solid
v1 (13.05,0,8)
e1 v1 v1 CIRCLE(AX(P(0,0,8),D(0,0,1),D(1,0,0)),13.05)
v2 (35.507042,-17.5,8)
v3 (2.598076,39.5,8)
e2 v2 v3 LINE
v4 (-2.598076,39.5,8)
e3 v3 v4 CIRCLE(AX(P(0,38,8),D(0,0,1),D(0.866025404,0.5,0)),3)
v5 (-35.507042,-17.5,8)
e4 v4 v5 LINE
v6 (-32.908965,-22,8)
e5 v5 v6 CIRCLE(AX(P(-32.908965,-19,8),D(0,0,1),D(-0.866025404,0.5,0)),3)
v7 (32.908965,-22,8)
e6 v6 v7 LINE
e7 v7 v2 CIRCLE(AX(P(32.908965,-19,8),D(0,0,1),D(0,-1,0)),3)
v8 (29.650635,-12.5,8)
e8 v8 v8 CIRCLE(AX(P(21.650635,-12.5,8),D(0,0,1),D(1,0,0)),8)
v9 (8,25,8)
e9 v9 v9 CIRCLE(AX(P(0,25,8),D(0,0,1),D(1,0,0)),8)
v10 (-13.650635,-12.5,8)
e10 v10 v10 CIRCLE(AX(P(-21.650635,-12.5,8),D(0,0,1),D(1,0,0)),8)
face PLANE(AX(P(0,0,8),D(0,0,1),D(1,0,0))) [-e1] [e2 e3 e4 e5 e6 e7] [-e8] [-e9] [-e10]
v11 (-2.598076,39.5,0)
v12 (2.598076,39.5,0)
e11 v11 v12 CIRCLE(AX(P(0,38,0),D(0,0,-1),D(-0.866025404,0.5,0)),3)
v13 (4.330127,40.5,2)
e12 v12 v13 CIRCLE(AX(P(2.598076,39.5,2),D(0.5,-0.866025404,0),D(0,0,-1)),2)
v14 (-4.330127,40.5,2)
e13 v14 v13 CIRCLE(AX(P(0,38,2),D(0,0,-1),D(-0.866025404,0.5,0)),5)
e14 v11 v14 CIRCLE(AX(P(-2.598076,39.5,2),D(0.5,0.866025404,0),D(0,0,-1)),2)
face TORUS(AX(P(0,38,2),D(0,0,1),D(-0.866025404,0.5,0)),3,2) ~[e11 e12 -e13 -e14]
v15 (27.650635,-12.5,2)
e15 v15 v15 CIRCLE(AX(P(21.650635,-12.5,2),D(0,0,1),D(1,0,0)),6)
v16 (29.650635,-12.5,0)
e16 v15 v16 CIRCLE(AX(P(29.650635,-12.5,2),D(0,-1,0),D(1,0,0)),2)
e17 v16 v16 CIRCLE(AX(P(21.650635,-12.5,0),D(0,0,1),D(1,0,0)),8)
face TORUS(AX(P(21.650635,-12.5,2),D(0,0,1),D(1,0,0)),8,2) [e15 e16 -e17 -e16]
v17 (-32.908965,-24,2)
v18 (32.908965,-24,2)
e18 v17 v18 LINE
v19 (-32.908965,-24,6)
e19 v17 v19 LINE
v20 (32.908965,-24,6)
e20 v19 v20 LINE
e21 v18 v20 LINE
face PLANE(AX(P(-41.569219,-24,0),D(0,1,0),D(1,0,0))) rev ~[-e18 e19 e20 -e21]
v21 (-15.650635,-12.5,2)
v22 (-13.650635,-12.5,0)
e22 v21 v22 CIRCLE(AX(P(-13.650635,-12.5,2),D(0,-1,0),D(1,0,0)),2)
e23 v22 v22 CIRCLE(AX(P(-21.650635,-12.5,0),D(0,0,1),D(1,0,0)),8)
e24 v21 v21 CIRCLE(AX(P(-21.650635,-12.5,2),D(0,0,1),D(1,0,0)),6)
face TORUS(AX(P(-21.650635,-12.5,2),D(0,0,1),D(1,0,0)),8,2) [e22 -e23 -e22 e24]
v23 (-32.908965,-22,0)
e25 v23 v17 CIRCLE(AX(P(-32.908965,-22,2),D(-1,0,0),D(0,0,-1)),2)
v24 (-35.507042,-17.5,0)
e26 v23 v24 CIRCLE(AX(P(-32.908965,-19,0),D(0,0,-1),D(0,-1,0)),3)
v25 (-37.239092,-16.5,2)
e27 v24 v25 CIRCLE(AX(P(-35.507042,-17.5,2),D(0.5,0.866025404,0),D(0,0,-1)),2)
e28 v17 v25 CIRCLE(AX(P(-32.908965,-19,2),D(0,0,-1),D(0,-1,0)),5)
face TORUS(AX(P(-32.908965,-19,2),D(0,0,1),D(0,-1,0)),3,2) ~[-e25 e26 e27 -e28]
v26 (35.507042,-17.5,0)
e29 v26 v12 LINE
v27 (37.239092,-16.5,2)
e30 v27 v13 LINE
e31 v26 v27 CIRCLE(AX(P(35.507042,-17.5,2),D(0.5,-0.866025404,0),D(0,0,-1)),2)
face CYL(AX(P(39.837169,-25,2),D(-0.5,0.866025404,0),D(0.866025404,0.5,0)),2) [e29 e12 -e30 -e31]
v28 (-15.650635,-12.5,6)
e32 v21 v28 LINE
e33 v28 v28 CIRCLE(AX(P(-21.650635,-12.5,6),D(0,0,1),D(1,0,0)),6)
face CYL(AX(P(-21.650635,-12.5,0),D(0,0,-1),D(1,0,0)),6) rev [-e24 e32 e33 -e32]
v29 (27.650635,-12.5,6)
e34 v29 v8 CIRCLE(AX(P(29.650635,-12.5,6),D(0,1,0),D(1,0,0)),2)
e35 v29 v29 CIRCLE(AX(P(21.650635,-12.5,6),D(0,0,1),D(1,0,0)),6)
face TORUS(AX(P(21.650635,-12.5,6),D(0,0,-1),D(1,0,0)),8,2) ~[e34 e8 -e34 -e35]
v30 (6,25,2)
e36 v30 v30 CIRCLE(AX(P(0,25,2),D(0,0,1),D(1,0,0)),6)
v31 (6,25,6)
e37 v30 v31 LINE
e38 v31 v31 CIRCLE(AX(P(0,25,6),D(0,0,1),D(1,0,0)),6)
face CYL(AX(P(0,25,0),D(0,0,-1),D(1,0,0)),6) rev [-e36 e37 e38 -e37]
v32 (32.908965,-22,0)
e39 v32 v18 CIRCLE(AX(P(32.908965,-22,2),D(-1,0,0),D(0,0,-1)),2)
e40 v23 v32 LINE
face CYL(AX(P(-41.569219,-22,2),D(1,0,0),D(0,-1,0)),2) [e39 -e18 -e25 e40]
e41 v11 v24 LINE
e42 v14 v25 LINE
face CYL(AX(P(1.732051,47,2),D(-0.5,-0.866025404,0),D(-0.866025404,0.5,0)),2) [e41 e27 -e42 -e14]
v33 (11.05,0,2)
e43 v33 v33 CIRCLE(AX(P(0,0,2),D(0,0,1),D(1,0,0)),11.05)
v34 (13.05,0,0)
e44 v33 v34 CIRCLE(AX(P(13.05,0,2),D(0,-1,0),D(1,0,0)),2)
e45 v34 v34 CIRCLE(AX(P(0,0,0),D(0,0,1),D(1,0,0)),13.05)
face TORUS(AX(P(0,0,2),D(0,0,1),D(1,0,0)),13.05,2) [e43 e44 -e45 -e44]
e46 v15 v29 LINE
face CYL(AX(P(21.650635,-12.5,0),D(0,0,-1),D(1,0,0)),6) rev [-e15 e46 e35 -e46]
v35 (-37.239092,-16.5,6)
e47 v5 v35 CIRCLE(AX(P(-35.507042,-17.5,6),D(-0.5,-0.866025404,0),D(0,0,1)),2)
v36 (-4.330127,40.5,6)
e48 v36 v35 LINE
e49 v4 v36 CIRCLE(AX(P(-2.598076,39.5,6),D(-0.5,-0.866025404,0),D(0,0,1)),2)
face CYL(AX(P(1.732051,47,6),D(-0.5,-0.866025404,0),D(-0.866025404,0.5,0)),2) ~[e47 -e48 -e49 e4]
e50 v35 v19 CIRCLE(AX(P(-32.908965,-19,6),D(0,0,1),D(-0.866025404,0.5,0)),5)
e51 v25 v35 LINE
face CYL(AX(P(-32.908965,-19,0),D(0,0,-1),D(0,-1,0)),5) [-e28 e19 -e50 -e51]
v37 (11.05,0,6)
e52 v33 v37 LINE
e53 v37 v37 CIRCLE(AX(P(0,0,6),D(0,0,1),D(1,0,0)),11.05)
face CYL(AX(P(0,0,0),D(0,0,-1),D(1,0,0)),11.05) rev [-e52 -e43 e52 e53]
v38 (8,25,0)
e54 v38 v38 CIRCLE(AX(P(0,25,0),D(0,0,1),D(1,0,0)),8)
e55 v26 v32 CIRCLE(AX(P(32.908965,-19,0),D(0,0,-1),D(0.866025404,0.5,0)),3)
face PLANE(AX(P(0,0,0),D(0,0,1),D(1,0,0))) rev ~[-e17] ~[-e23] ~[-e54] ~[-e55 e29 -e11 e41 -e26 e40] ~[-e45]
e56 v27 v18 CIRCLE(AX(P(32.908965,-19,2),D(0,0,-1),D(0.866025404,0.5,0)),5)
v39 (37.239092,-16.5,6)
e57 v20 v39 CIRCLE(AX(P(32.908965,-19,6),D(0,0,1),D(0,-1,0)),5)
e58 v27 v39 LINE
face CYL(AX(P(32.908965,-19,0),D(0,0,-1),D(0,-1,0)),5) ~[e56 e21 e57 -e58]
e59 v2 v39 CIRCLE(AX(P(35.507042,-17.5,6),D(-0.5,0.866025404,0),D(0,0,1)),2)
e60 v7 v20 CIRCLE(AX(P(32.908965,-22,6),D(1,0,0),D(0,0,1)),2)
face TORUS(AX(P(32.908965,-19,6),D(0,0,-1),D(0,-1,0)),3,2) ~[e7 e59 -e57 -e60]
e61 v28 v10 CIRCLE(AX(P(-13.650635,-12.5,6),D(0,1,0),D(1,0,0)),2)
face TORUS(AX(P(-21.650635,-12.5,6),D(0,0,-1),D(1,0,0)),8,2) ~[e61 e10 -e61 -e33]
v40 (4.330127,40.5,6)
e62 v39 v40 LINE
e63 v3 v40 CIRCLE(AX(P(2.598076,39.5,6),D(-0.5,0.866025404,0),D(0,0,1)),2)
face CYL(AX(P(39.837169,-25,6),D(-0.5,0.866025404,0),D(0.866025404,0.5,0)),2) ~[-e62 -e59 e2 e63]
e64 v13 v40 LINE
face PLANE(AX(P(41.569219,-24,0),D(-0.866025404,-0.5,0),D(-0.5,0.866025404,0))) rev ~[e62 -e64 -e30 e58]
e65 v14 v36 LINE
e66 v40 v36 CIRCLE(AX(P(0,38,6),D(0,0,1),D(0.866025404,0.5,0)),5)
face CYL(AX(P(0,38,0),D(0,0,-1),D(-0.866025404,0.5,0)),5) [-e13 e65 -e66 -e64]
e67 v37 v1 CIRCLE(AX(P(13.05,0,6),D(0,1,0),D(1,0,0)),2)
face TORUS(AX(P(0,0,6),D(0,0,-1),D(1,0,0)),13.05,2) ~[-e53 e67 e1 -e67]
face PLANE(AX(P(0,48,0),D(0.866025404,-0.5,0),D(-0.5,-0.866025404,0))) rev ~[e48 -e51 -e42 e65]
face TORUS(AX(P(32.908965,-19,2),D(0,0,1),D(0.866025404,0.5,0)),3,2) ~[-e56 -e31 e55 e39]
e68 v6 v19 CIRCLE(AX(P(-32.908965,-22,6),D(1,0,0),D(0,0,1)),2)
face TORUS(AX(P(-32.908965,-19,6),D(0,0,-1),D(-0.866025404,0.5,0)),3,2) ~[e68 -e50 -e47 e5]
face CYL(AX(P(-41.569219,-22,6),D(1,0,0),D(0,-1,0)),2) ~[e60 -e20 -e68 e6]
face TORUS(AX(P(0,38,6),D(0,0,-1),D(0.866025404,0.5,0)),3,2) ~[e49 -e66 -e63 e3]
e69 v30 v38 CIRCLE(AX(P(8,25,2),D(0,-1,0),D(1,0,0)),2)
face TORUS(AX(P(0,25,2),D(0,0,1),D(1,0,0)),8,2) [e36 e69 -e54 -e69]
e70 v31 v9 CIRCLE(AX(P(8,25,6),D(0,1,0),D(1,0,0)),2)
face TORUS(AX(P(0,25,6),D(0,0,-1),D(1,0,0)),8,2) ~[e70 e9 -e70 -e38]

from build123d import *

# Parameters (mm, degrees)
F0_R         = 6
F0_R_2       = 11.05
F1_DEPTH     = 8
F2_R         = 2
F3_T1_DEPTH  = 8
F3_T4_ANGLE  = 120
F3_T6_ANGLE  = 120
F3_T8_ANGLE  = 120
F3_T10_ANGLE = 120
F3_T12_ANGLE = 120
F3_T14_ANGLE = 120


# Not quite as in the source:
# - a fillet or chamfer that OpenCascade refuses, or shapes differently, is made with other operations: its cross-section is extruded or revolved along the edge and cut away or added


with BuildPart() as f1:
    # F0 (on Top) → F1 (new body)
    with BuildSketch(Plane.XY):
        Polygon((-41.5692193817, -24), (41.5692193817, -24), (0, 48), align=None)
        with Locations((-21.6506350946, -12.5)):
            Circle(F0_R, mode=Mode.SUBTRACT)
        with Locations((21.6506350946, -12.5)):
            Circle(F0_R, mode=Mode.SUBTRACT)
        Circle(F0_R_2, mode=Mode.SUBTRACT)
        with Locations((0, 25)):
            Circle(F0_R, mode=Mode.SUBTRACT)
    extrude(amount=F1_DEPTH)

    # F2
    f2_edges = [f1.edges().sort_by_distance(p)[0] for p in [
        (0, -24, 8),
        (20.78461, 12, 8),
        (-20.78461, 12, 8),
        (-27.650635, -12.5, 8),
        (15.650635, -12.5, 8),
        (-11.05, 0, 8),
        (-6, 25, 8),
        (0, -24, 0),
        (20.78461, 12, 0),
        (-20.78461, 12, 0),
        (-27.650635, -12.5, 0),
        (15.650635, -12.5, 0),
        (-11.05, 0, 0),
        (-6, 25, 0),
    ]]
    fillet(f2_edges, radius=F2_R)

    # F3: fillet of radius 5 on 3 edges, made by hand

    # F3_s2 → F3_t1 (cut)
    with BuildSketch(Plane.XY):
        with BuildLine():
            ThreePointArc((32.9089653438, -24), (37.2390923627, -21.5), (37.2390923627, -16.5))
            Line((37.2390923627, -16.5), (41.5692193817, -24))
            Line((41.5692193817, -24), (32.9089653438, -24))
        make_face()
        with BuildLine():
            ThreePointArc((-32.9089653438, -24), (-37.2390923627, -21.5), (-37.2390923627, -16.5))
            Line((-37.2390923627, -16.5), (-41.5692193817, -24))
            Line((-41.5692193817, -24), (-32.9089653438, -24))
        make_face()
        with BuildLine():
            ThreePointArc((-4.3301270189, 40.5), (0, 43), (4.3301270189, 40.5))
            Line((4.3301270189, 40.5), (0, 48))
            Line((0, 48), (-4.3301270189, 40.5))
        make_face()
    extrude(amount=F3_T1_DEPTH, mode=Mode.SUBTRACT)

    # F3_s3 → F3_t4 (revolve, cut)
    with BuildSketch(Plane(origin=(16.4544826719, 28.5, 0), x_dir=(0, 0, 1), z_dir=(-0.5, -0.8660254038, 0))):
        with BuildLine():
            ThreePointArc((0, 22), (0.5857864376, 23.4142135624), (2, 24))
            Line((2, 24), (0, 24))
            Line((0, 24), (0, 22))
        make_face()
    revolve(axis=Axis((0, 38, 0), (0, 0, -1)), revolution_arc=F3_T4_ANGLE, mode=Mode.SUBTRACT)

    # F3_s5 → F3_t6 (revolve, cut)
    with BuildSketch(Plane(origin=(-16.4544826719, 28.5, 0), x_dir=(0, 0, 1), z_dir=(0.5, -0.8660254038, 0))):
        with BuildLine():
            ThreePointArc((8, -22), (7.4142135624, -23.4142135624), (6, -24))
            Line((6, -24), (8, -24))
            Line((8, -24), (8, -22))
        make_face()
    revolve(axis=Axis((0, 38, 8), (0, 0, 1)), revolution_arc=F3_T6_ANGLE, mode=Mode.SUBTRACT)

    # F3_s7 → F3_t8 (revolve, cut)
    with BuildSketch(Plane.YZ.offset(-32.9089653438)):
        with BuildLine():
            ThreePointArc((-22, 0), (-23.4142135624, 0.5857864376), (-24, 2))
            Line((-24, 2), (-24, 0))
            Line((-24, 0), (-22, 0))
        make_face()
    revolve(axis=Axis((-32.9089653438, -19, 0), (0, 0, -1)), revolution_arc=F3_T8_ANGLE, mode=Mode.SUBTRACT)

    # F3_s9 → F3_t10 (revolve, cut)
    with BuildSketch(Plane(origin=(-16.4544826719, -28.5, 0), x_dir=(0, 0, 1), z_dir=(0.5, 0.8660254038, 0))):
        with BuildLine():
            ThreePointArc((8, -22), (7.4142135624, -23.4142135624), (6, -24))
            Line((6, -24), (8, -24))
            Line((8, -24), (8, -22))
        make_face()
    revolve(axis=Axis((-32.9089653438, -19, 8), (0, 0, 1)), revolution_arc=F3_T10_ANGLE, mode=Mode.SUBTRACT)

    # F3_s11 → F3_t12 (revolve, cut)
    with BuildSketch(Plane(origin=(16.4544826719, -28.5, 0), x_dir=(0, 0, 1), z_dir=(-0.5, 0.8660254038, 0))):
        with BuildLine():
            ThreePointArc((0, 22), (0.5857864376, 23.4142135624), (2, 24))
            Line((2, 24), (0, 24))
            Line((0, 24), (0, 22))
        make_face()
    revolve(axis=Axis((32.9089653438, -19, 0), (0, 0, -1)), revolution_arc=F3_T12_ANGLE, mode=Mode.SUBTRACT)

    # F3_s13 → F3_t14 (revolve, cut)
    with BuildSketch(Plane.YZ.offset(32.9089653438)):
        with BuildLine():
            ThreePointArc((-22, 8), (-23.4142135624, 7.4142135624), (-24, 6))
            Line((-24, 6), (-24, 8))
            Line((-24, 8), (-22, 8))
        make_face()
    revolve(axis=Axis((32.9089653438, -19, 8), (0, 0, 1)), revolution_arc=F3_T14_ANGLE, mode=Mode.SUBTRACT)


solid = f1.part
